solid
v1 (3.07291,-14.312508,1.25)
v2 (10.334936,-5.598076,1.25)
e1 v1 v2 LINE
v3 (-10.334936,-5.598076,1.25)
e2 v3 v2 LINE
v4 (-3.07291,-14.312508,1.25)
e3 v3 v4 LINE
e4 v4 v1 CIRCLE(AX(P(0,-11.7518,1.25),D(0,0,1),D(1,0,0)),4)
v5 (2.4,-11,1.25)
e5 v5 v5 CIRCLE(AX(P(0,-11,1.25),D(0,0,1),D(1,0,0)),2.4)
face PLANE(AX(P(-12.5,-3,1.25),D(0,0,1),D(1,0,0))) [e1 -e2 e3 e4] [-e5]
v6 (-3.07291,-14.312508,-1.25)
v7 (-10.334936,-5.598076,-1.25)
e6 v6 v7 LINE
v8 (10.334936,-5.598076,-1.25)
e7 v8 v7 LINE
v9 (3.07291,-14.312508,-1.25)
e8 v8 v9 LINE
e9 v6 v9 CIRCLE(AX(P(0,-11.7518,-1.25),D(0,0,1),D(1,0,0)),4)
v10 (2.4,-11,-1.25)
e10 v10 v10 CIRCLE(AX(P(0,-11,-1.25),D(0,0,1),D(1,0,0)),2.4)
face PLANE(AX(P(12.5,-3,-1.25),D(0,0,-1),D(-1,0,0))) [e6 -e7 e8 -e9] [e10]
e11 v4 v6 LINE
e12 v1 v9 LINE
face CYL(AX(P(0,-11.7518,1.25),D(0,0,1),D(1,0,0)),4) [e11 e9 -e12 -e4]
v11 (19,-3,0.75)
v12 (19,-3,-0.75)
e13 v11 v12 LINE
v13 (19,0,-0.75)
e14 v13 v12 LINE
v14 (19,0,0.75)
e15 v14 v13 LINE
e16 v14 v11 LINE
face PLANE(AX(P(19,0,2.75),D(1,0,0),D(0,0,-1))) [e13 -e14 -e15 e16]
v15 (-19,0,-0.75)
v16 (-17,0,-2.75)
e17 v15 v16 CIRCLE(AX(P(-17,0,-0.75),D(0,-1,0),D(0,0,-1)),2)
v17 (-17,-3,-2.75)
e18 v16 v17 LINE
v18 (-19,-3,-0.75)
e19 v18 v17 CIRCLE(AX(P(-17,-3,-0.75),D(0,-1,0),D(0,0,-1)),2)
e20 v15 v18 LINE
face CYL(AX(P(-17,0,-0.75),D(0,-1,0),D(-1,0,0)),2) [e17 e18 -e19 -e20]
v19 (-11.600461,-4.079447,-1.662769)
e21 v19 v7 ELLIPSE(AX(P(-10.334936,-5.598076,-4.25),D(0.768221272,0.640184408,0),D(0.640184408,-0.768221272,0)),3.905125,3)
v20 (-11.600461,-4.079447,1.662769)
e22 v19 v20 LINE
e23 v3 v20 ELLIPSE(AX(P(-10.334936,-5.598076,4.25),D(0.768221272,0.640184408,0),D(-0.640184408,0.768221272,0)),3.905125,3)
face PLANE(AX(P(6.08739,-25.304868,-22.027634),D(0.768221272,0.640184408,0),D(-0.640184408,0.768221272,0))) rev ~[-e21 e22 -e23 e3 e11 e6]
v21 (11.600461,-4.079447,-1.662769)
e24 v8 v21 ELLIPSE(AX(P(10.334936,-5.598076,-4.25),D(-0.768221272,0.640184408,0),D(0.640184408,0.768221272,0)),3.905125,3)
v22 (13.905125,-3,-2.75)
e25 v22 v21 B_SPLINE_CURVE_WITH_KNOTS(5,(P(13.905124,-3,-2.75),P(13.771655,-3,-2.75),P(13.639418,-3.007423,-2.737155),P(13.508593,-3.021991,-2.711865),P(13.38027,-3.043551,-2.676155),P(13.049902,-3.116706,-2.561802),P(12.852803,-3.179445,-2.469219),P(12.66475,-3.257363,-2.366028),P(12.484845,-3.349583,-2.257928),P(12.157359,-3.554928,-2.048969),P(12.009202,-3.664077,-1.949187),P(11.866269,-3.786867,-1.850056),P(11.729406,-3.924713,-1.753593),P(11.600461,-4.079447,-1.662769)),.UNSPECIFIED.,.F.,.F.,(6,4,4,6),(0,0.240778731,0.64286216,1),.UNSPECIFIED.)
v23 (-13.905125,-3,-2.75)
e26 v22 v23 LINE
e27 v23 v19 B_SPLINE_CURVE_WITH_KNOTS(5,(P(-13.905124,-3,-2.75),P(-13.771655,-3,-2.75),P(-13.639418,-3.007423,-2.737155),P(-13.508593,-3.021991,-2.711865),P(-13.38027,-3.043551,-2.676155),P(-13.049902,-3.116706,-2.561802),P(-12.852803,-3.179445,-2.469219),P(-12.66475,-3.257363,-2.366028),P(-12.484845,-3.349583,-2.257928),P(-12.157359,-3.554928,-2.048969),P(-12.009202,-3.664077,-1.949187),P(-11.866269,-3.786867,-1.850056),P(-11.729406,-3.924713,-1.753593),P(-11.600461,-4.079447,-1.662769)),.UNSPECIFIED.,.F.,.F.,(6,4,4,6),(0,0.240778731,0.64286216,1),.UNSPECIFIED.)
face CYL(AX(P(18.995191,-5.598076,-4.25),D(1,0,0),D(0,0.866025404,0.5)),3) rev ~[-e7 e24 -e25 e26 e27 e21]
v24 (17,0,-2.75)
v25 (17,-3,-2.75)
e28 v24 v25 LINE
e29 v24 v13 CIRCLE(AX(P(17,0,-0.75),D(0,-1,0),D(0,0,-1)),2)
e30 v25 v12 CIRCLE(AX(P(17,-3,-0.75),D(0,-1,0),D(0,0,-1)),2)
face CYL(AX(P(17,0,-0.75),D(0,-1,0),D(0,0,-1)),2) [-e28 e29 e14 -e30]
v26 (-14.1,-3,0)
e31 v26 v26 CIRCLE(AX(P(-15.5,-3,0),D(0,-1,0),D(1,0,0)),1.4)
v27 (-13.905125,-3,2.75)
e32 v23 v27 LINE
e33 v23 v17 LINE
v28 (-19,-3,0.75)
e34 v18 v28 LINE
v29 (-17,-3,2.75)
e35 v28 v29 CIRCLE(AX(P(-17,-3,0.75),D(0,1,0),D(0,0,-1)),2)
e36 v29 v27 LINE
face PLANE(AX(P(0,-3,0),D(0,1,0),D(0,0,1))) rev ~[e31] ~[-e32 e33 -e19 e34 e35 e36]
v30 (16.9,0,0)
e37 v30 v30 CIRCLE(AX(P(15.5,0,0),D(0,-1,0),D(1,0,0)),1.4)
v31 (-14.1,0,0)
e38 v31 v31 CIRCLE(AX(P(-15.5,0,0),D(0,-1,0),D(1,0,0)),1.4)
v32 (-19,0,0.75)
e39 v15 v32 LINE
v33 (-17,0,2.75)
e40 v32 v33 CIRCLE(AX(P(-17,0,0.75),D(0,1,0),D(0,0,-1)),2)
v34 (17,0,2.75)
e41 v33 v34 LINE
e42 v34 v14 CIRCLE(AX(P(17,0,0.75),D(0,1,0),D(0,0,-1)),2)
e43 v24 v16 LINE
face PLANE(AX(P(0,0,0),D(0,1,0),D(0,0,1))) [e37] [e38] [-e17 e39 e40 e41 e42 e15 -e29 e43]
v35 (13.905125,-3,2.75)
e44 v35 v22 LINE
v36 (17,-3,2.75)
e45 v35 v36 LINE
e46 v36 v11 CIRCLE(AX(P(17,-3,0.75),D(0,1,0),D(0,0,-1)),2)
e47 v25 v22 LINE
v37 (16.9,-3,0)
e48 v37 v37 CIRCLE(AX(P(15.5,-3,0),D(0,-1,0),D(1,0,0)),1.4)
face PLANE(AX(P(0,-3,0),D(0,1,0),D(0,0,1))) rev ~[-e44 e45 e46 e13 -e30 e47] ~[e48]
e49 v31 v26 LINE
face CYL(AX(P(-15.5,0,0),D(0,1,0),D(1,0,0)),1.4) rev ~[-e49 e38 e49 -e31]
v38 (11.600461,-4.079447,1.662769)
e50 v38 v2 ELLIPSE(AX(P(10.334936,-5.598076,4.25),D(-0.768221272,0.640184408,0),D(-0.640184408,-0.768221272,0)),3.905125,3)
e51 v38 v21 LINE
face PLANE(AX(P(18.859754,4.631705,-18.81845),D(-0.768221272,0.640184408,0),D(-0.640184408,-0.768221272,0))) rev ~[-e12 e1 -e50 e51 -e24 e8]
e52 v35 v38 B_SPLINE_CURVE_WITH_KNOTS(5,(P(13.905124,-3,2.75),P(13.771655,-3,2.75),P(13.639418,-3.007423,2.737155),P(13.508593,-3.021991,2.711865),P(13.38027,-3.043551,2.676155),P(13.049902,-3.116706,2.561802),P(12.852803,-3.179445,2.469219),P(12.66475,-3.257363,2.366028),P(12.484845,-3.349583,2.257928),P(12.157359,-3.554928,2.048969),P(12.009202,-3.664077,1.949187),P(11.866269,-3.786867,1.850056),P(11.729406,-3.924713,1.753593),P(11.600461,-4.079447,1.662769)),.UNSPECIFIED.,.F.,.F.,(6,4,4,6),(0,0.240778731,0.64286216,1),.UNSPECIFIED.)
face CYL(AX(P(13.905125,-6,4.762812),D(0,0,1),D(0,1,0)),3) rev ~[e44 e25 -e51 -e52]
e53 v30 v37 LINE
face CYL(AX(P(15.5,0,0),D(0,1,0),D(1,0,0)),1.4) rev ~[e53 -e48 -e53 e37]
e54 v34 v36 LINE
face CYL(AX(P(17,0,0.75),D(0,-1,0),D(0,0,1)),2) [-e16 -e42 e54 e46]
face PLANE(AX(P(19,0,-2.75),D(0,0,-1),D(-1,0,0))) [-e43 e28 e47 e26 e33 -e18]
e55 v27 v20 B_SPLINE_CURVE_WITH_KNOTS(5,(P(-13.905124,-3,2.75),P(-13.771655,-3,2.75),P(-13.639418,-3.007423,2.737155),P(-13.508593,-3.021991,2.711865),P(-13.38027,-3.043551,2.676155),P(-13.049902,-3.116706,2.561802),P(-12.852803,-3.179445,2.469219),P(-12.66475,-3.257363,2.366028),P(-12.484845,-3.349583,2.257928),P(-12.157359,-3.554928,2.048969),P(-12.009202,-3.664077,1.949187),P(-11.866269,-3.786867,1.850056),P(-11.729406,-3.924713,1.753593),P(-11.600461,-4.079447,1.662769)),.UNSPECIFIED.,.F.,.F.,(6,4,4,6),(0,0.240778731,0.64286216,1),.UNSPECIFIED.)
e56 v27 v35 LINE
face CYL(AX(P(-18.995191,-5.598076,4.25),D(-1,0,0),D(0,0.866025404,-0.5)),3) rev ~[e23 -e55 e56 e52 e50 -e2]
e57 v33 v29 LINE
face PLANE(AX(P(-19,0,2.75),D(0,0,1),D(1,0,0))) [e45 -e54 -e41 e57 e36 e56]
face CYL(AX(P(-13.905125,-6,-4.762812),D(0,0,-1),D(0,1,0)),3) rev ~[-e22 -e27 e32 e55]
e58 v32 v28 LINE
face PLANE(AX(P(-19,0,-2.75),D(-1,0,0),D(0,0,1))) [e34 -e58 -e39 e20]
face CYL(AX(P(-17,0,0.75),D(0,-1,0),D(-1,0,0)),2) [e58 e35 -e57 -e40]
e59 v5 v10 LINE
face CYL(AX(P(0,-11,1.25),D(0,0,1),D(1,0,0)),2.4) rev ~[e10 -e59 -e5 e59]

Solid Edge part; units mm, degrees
sketch "Sketch1" plane through (0, 0, 0) normal (0, -1, 0) x (1, 0, 0)
  circle A0 centre (-15.5, 0) radius 1.4
  line L0 (-19, -2.75) -> (-19, 2.75)
  line L1 (-19, 2.75) -> (19, 2.75)
  line L2 (19, 2.75) -> (19, -2.75)
  line L3 (19, -2.75) -> (-19, -2.75)
  circle A1 centre (15.5, 0) radius 1.4
  dimension "D1" = 38
  dimension "D2" = 5.5
  dimension "D3" = 31
  dimension "D4" = 15.5
extrude "Protrusion1" add sketch "Sketch1" along normal blind 3
sketch "Sketch2" plane through (0, -3, 0) normal (0, -1, 0) x (1, 0, 0)
  line L0 (12.5, -1.25) -> (-12.5, -1.25)
  line L1 (-12.5, -1.25) -> (-12.5, 1.25)
  line L2 (-12.5, 1.25) -> (12.5, 1.25)
  line L3 (12.5, 1.25) -> (12.5, -1.25)
extrude "ExtrudedProtrusion_2" add sketch "Sketch2" along normal blind 15
sketch "Sketch3" plane through (0, -10.5, 1.25) normal (0, 0, 1) x (1, 0, 0)
  line L0 (-12.5, 7.5) -> (-3.0729, -3.8125)
  arc A0 (-3.0729, -3.8125) -> (3.0729, -3.8125) centre (0, -1.2518) ccw
  line L1 (3.0729, -3.8125) -> (12.5, 7.5)
  line L2 (12.5, -7.5) -> (12.5, 7.5)
  line L3 (-12.5, -7.5) -> (12.5, -7.5)
  line L4 (-12.5, -7.5) -> (-12.5, 7.5)
extrude "ExtrudedCutout_1" cut sketch "Sketch3" against normal blind 25.6069
sketch "Sketch4" plane through (0, -10.5, 1.25) normal (0, 0, 1) x (1, 0, 0)
  circle A0 centre (0, -0.5) radius 2.4
extrude "ExtrudedCutout_2" cut sketch "Sketch4" against normal blind 14.916
fillet "Round_1" radius 3 4 edges at (0, -3, 1.25) (0, -3, -1.25) (12.5, -3, 0) (-12.5, -3, 0)
fillet "Round_2" radius 2 4 edges at (-19, -1.5, 2.75) (-19, -1.5, -2.75) (19, -1.5, -2.75) (19, -1.5, 2.75)
properties material "PLA"
